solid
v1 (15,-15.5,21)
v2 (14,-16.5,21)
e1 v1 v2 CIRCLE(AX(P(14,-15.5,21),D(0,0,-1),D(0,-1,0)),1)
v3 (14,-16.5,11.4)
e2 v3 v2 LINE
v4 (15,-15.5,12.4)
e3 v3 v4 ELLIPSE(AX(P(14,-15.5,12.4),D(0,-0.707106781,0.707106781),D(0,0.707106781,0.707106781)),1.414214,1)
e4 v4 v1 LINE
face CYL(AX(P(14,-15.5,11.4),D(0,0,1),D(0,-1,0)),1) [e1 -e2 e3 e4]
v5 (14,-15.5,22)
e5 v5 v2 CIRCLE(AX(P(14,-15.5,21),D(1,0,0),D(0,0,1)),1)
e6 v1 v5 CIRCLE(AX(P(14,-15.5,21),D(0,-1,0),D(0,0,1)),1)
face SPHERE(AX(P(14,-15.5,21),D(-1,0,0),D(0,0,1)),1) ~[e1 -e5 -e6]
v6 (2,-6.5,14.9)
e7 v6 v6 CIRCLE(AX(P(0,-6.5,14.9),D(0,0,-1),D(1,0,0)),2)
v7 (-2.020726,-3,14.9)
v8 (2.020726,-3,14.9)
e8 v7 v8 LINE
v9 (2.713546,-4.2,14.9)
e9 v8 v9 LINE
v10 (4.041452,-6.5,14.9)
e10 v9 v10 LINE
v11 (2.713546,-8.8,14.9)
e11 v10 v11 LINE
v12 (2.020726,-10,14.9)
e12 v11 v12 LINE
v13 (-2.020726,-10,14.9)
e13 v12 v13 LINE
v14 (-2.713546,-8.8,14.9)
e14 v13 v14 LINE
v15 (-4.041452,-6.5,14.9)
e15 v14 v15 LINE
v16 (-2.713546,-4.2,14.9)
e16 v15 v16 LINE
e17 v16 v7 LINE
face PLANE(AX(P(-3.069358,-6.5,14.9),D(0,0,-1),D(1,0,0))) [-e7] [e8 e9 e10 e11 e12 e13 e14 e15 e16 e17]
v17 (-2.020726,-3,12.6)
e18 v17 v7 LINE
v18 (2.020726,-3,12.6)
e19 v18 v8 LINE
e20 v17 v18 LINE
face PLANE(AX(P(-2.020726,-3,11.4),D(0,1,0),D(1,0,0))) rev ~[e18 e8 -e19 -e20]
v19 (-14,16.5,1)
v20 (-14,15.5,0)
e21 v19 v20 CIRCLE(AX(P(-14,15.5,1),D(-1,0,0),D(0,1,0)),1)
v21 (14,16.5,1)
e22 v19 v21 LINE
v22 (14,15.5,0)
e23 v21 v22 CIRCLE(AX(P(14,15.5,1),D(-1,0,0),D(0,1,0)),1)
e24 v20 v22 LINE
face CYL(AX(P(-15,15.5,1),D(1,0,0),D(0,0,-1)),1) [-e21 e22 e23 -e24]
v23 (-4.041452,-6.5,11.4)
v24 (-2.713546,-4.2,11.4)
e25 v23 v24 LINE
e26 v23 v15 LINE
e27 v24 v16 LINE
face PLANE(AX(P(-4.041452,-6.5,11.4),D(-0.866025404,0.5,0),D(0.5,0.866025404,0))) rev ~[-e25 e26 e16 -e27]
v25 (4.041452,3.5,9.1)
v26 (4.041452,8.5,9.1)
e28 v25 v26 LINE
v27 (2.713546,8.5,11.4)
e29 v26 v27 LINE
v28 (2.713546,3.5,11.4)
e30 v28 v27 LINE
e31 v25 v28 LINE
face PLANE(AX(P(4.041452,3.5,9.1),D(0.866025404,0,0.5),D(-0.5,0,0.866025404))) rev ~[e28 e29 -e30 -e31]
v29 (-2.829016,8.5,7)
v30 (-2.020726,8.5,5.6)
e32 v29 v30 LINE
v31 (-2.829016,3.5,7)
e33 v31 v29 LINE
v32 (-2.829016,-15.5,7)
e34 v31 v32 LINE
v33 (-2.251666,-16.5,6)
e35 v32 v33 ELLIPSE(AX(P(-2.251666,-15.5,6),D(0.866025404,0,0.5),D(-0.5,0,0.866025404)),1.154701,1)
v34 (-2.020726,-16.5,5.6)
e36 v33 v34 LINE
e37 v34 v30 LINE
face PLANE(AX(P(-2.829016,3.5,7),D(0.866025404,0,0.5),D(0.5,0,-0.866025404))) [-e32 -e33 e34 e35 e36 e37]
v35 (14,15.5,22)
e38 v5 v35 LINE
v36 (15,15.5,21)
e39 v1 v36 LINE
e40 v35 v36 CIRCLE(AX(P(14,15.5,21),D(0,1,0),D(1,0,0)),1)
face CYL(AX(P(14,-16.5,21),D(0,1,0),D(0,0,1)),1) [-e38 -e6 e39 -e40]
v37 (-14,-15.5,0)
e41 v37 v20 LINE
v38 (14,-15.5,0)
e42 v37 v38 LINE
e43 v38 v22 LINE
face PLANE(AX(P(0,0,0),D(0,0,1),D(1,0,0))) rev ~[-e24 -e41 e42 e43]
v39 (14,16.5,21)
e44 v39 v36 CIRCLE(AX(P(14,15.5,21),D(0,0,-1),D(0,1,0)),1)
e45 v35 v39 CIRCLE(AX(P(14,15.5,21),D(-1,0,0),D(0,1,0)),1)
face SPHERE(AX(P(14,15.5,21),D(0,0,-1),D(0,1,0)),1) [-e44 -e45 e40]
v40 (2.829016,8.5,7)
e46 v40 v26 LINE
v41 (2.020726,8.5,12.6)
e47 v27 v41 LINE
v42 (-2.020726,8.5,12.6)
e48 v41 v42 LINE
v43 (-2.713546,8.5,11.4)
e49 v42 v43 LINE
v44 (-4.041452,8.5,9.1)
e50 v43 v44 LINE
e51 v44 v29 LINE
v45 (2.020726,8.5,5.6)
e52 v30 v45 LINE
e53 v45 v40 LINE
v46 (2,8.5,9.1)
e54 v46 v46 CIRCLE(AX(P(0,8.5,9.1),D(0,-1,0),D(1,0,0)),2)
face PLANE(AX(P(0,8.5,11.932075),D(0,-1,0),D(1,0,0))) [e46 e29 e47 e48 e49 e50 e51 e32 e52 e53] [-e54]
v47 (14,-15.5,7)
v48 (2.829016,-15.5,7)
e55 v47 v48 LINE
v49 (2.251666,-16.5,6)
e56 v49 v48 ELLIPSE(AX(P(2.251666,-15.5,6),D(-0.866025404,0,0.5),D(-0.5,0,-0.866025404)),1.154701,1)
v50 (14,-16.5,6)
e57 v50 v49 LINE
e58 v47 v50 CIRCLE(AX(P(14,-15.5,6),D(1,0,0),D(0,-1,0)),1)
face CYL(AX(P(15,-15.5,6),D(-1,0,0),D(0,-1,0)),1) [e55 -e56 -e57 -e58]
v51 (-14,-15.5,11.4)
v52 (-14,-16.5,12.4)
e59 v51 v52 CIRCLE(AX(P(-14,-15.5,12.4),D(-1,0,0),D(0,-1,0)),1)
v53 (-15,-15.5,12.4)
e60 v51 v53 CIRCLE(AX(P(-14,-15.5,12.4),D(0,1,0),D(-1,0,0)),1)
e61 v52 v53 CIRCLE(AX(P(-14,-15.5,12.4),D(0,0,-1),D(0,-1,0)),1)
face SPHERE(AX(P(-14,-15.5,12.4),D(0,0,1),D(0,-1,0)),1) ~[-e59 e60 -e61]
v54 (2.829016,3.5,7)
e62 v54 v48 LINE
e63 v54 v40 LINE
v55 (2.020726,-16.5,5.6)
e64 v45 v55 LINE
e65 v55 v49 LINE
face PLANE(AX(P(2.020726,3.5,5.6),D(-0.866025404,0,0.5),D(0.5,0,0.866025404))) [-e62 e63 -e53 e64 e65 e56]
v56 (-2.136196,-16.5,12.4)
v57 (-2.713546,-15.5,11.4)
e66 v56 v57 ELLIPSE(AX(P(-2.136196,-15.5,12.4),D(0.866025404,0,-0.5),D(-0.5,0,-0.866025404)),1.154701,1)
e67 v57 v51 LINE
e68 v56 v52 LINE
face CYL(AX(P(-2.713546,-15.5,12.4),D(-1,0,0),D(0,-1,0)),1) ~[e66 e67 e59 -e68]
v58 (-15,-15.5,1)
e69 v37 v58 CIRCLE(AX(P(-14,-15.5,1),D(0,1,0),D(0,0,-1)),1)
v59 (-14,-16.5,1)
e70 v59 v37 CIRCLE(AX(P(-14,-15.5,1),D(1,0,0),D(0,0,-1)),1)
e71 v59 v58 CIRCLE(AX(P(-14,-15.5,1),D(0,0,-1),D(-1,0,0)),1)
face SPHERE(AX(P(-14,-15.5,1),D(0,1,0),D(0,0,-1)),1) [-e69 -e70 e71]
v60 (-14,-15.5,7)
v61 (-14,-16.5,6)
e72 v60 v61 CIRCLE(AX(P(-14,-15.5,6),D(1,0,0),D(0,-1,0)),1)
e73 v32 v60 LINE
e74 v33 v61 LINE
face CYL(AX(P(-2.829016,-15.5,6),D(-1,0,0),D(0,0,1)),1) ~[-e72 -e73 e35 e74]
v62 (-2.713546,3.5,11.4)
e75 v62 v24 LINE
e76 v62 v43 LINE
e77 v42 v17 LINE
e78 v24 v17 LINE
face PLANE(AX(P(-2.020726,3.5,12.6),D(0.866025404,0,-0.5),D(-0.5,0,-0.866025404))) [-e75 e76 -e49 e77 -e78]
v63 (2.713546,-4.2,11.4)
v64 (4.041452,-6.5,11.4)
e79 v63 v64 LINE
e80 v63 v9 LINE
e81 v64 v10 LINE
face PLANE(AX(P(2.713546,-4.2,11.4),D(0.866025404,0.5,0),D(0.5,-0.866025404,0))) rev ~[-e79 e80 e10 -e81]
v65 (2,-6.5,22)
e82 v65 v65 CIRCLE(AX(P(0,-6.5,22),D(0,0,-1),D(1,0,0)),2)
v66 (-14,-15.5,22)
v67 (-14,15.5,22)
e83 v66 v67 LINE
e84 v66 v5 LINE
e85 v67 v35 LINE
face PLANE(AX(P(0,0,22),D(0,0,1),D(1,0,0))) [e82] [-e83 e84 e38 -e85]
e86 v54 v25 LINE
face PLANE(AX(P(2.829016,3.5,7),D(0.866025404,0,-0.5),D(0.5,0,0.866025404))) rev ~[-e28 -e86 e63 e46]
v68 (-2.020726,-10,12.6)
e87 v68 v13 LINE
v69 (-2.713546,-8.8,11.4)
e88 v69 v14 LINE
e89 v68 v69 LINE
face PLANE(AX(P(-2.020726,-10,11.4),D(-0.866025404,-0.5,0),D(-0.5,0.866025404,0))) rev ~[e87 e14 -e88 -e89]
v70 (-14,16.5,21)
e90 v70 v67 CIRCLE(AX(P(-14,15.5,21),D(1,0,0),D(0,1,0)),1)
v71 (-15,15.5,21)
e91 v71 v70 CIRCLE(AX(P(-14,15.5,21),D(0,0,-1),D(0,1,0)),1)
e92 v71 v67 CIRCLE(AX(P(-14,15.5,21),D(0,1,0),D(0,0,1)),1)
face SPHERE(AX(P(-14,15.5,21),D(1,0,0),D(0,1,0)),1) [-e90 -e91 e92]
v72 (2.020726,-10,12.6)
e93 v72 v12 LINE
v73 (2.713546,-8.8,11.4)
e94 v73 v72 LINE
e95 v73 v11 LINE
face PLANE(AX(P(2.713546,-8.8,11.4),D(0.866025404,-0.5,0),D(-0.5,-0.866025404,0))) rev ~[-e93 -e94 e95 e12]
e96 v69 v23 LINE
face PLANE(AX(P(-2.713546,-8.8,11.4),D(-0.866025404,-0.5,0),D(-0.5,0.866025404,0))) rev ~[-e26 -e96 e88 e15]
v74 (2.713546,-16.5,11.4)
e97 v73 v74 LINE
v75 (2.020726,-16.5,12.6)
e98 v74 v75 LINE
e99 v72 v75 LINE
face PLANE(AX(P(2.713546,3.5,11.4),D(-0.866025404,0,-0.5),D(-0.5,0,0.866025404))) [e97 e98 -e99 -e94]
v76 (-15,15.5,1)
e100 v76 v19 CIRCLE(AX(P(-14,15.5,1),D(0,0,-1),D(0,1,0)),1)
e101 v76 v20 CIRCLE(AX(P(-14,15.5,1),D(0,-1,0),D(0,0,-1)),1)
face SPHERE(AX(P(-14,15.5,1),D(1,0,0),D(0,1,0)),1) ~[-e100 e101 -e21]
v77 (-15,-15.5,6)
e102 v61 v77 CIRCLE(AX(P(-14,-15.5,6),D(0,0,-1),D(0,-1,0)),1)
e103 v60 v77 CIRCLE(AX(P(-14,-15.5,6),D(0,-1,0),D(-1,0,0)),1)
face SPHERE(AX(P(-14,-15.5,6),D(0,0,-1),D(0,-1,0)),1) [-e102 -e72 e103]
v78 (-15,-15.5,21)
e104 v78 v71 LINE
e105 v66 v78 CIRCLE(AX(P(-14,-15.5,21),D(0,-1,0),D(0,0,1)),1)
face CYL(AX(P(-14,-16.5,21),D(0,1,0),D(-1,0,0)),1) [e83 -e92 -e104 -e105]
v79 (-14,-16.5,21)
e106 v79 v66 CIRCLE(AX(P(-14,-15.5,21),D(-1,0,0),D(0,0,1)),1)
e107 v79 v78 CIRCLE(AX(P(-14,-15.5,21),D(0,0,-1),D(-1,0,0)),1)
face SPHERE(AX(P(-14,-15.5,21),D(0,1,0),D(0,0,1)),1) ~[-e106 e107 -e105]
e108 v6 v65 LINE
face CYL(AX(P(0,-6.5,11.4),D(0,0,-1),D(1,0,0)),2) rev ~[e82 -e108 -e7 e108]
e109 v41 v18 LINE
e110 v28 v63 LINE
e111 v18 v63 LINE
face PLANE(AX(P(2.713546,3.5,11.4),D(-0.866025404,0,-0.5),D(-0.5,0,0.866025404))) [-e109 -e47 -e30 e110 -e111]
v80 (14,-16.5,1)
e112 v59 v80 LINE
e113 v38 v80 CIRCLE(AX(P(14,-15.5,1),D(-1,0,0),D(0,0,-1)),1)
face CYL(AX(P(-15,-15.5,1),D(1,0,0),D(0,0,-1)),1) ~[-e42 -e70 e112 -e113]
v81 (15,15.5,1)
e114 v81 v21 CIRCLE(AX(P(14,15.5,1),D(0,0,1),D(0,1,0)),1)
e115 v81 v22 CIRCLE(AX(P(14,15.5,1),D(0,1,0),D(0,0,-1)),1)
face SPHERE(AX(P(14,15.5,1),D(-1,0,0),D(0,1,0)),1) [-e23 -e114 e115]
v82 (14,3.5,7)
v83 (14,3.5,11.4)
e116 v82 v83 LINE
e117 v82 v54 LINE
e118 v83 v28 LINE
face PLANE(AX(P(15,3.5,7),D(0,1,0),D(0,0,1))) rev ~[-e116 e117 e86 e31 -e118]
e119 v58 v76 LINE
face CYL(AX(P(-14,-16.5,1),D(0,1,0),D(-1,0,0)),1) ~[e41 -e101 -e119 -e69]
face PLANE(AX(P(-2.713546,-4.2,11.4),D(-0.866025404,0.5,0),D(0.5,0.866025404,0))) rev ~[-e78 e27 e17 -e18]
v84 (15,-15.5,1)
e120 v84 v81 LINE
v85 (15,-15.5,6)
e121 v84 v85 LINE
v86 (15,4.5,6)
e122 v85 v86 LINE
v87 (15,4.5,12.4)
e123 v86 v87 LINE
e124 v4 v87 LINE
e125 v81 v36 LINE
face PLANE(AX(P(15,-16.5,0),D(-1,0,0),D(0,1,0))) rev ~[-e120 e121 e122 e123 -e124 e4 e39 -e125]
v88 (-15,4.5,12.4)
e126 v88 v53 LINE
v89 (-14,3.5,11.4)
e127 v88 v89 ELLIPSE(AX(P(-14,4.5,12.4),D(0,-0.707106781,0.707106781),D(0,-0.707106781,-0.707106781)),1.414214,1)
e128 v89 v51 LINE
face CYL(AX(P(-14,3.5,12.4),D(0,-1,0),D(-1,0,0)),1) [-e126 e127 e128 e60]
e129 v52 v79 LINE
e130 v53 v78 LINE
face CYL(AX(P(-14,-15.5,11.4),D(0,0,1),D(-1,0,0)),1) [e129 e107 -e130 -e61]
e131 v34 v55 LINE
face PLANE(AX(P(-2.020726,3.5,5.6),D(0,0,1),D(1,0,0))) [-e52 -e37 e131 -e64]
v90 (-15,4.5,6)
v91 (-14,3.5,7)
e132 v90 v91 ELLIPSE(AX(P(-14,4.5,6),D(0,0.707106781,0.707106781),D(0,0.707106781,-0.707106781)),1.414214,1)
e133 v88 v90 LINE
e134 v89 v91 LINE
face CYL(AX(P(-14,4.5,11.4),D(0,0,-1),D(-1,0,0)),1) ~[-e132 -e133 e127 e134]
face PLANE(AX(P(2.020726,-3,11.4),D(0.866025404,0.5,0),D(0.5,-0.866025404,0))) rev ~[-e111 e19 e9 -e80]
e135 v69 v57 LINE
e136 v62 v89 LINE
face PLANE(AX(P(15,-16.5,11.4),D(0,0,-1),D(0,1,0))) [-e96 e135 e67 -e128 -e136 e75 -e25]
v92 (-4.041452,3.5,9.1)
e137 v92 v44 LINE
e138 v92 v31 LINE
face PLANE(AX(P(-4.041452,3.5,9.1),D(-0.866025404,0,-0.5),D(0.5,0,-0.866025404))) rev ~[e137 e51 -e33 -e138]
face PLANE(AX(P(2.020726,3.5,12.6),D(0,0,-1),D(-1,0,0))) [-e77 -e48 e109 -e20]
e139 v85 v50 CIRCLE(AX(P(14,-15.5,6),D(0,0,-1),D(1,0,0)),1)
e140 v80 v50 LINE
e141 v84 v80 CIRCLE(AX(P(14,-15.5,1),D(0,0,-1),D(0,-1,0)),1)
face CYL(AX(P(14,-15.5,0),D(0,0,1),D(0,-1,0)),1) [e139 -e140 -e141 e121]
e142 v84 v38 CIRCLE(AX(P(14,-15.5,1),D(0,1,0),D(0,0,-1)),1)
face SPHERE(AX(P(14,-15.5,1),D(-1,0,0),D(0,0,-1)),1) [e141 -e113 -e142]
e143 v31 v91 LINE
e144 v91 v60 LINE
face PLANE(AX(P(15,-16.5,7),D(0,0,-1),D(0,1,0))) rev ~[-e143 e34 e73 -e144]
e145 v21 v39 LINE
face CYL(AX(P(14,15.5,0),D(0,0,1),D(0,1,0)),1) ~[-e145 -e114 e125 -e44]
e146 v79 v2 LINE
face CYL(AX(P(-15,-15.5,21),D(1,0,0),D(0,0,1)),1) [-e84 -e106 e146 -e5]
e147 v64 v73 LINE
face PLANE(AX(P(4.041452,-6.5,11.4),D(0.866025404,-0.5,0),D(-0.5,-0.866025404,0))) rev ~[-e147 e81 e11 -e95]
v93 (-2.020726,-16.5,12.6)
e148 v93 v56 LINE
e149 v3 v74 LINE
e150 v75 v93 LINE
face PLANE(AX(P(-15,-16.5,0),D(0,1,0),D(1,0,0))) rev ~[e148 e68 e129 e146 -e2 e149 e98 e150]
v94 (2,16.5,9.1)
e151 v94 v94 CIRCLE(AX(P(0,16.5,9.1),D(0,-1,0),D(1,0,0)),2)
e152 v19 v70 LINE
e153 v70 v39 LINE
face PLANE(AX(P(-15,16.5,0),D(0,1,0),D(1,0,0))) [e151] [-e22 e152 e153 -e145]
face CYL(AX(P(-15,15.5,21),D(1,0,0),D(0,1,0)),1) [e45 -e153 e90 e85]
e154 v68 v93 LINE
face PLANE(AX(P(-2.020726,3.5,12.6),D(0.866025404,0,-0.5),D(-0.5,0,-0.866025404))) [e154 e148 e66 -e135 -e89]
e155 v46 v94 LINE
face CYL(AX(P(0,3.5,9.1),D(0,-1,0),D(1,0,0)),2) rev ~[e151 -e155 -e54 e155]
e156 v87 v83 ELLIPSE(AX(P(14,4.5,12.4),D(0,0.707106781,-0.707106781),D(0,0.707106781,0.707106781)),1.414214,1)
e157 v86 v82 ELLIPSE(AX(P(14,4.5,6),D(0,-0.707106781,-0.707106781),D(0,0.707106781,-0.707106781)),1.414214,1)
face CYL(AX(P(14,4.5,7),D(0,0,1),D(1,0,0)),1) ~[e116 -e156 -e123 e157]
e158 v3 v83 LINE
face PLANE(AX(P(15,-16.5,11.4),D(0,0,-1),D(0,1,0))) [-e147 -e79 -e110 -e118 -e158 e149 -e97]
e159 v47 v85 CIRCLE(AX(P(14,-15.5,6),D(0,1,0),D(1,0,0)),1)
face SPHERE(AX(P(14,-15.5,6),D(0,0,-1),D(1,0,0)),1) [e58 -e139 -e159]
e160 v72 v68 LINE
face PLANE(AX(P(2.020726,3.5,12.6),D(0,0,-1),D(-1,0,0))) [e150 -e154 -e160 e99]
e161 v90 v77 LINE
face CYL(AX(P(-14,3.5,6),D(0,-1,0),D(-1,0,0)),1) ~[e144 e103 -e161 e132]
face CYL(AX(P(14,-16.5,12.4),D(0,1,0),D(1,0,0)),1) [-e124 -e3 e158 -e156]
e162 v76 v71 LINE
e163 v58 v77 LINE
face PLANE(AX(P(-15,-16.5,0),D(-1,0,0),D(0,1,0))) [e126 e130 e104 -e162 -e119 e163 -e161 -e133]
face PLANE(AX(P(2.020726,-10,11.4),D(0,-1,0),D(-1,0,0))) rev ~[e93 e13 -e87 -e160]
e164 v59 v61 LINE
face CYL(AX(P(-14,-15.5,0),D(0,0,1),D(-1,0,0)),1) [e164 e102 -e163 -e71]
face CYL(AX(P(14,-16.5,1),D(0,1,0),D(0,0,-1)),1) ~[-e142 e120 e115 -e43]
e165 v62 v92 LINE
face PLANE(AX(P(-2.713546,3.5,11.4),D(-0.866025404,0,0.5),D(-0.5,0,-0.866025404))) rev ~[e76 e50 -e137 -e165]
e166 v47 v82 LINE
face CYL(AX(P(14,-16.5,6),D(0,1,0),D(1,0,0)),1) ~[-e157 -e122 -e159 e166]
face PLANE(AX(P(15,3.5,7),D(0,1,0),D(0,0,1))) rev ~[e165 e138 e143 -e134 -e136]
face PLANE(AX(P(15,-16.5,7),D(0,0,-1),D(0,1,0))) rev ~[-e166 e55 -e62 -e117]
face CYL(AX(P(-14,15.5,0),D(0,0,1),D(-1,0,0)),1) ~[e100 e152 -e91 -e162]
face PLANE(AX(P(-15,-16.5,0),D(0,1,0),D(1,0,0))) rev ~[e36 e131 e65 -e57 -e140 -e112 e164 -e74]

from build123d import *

# Parameters (mm, degrees)
F0_W          = 30
F0_H          = 33
F1_DEPTH      = 22
F2_W          = 20
F2_H          = 4.4
F3_DEPTH      = 30.001
F4_R          = 2
F5_DEPTH      = 5
F5_DEPTH_BACK = 20.001
F6_DEPTH      = 13.001
F7_R          = 2
F8_DEPTH      = 10.601
F9_DEPTH      = 3.5
F10_R         = 1


with BuildPart() as f1:
    # F0 (on Top) → F1 (new body)
    with BuildSketch(Plane.XY):
        Rectangle(F0_W, F0_H)
    extrude(amount=F1_DEPTH)

    # F2 (on face) → F3 (cut, through all)
    with BuildSketch(Plane.YZ.offset(15)):
        with Locations((-6.5, 9.2)):
            Rectangle(F2_W, F2_H)
    extrude(amount=-F3_DEPTH, mode=Mode.SUBTRACT)

    # F4 (on face) → F5 (cut, two sides)
    with BuildSketch(Plane.XZ.offset(-3.5)) as f5_sk:
        Polygon((-2.7135462652, 11.4), (2.7135462652, 11.4), (2.0207259422, 12.6), (-2.0207259422, 12.6), align=None)
        Polygon((-2.829016319, 7), (2.829016319, 7), (4.0414518843, 9.1), (2.7135462652, 11.4), (-2.7135462652, 11.4), (-4.0414518843, 9.1), align=None)
        with Locations((0, 9.1)):
            Circle(F4_R, mode=Mode.SUBTRACT)
        Polygon((-2.0207259422, 5.6), (2.0207259422, 5.6), (2.829016319, 7), (-2.829016319, 7), align=None)
    extrude(amount=-F5_DEPTH, mode=Mode.SUBTRACT)
    extrude(f5_sk.sketch, amount=F5_DEPTH_BACK, mode=Mode.SUBTRACT)

    # F6 (cut, through all): a face of the model
    f6_faces = [f1.faces().sort_by_distance(p)[0] for p in [
        (0, 3.5, 9.1),
    ]]
    extrude(f6_faces, amount=-F6_DEPTH, mode=Mode.SUBTRACT)

    # F7 (on face) → F8 (cut, through all)
    with BuildSketch(Plane(origin=(0, 0, 11.4), x_dir=(1, 0, 0), z_dir=(0, 0, -1))):
        with Locations((0, 6.5)):
            Circle(F7_R)
    extrude(amount=-F8_DEPTH, mode=Mode.SUBTRACT)

    # F7 (on face) → F9 (cut)
    with BuildSketch(Plane(origin=(0, 0, 11.4), x_dir=(1, 0, 0), z_dir=(0, 0, -1))):
        Polygon((-4.0414518843, 6.5), (-2.7135462652, 4.2), (-2.7135462652, 8.8), align=None)
        Polygon((-2.7135462652, 8.8), (-2.7135462652, 4.2), (-2.0207259422, 3), (2.0207259422, 3), (2.7135462652, 4.2), (2.7135462652, 8.8), (2.0207259422, 10), (-2.0207259422, 10), align=None)
        with Locations((0, 6.5)):
            Circle(F7_R, mode=Mode.SUBTRACT)
        Polygon((2.7135462652, 8.8), (2.7135462652, 4.2), (4.0414518843, 6.5), align=None)
    extrude(amount=-F9_DEPTH, mode=Mode.SUBTRACT)

    # F10
    f10_edges = [f1.edges().sort_by_distance(p)[0] for p in [
        (0, 16.5, 0),
        (15, 16.5, 11),
        (0, 16.5, 22),
        (-15, 16.5, 11),
        (-15, 0, 0),
        (0, -16.5, 0),
        (15, 0, 0),
        (-15, 0, 22),
        (0, -16.5, 22),
        (15, 0, 22),
        (-15, -16.5, 3.5),
        (-15, -16.5, 16.7),
        (15, -16.5, 3.5),
        (15, -16.5, 16.7),
        (15, -6.5, 11.4),
        (15, -6.5, 7),
        (8.914508, -16.5, 7),
        (-8.914508, -16.5, 7),
        (-8.856773, -16.5, 11.4),
        (-15, 3.5, 9.2),
        (-15, -6.5, 7),
        (-15, -6.5, 11.4),
        (15, 3.5, 9.2),
    ]]
    fillet(f10_edges, radius=F10_R)


solid = f1.part
